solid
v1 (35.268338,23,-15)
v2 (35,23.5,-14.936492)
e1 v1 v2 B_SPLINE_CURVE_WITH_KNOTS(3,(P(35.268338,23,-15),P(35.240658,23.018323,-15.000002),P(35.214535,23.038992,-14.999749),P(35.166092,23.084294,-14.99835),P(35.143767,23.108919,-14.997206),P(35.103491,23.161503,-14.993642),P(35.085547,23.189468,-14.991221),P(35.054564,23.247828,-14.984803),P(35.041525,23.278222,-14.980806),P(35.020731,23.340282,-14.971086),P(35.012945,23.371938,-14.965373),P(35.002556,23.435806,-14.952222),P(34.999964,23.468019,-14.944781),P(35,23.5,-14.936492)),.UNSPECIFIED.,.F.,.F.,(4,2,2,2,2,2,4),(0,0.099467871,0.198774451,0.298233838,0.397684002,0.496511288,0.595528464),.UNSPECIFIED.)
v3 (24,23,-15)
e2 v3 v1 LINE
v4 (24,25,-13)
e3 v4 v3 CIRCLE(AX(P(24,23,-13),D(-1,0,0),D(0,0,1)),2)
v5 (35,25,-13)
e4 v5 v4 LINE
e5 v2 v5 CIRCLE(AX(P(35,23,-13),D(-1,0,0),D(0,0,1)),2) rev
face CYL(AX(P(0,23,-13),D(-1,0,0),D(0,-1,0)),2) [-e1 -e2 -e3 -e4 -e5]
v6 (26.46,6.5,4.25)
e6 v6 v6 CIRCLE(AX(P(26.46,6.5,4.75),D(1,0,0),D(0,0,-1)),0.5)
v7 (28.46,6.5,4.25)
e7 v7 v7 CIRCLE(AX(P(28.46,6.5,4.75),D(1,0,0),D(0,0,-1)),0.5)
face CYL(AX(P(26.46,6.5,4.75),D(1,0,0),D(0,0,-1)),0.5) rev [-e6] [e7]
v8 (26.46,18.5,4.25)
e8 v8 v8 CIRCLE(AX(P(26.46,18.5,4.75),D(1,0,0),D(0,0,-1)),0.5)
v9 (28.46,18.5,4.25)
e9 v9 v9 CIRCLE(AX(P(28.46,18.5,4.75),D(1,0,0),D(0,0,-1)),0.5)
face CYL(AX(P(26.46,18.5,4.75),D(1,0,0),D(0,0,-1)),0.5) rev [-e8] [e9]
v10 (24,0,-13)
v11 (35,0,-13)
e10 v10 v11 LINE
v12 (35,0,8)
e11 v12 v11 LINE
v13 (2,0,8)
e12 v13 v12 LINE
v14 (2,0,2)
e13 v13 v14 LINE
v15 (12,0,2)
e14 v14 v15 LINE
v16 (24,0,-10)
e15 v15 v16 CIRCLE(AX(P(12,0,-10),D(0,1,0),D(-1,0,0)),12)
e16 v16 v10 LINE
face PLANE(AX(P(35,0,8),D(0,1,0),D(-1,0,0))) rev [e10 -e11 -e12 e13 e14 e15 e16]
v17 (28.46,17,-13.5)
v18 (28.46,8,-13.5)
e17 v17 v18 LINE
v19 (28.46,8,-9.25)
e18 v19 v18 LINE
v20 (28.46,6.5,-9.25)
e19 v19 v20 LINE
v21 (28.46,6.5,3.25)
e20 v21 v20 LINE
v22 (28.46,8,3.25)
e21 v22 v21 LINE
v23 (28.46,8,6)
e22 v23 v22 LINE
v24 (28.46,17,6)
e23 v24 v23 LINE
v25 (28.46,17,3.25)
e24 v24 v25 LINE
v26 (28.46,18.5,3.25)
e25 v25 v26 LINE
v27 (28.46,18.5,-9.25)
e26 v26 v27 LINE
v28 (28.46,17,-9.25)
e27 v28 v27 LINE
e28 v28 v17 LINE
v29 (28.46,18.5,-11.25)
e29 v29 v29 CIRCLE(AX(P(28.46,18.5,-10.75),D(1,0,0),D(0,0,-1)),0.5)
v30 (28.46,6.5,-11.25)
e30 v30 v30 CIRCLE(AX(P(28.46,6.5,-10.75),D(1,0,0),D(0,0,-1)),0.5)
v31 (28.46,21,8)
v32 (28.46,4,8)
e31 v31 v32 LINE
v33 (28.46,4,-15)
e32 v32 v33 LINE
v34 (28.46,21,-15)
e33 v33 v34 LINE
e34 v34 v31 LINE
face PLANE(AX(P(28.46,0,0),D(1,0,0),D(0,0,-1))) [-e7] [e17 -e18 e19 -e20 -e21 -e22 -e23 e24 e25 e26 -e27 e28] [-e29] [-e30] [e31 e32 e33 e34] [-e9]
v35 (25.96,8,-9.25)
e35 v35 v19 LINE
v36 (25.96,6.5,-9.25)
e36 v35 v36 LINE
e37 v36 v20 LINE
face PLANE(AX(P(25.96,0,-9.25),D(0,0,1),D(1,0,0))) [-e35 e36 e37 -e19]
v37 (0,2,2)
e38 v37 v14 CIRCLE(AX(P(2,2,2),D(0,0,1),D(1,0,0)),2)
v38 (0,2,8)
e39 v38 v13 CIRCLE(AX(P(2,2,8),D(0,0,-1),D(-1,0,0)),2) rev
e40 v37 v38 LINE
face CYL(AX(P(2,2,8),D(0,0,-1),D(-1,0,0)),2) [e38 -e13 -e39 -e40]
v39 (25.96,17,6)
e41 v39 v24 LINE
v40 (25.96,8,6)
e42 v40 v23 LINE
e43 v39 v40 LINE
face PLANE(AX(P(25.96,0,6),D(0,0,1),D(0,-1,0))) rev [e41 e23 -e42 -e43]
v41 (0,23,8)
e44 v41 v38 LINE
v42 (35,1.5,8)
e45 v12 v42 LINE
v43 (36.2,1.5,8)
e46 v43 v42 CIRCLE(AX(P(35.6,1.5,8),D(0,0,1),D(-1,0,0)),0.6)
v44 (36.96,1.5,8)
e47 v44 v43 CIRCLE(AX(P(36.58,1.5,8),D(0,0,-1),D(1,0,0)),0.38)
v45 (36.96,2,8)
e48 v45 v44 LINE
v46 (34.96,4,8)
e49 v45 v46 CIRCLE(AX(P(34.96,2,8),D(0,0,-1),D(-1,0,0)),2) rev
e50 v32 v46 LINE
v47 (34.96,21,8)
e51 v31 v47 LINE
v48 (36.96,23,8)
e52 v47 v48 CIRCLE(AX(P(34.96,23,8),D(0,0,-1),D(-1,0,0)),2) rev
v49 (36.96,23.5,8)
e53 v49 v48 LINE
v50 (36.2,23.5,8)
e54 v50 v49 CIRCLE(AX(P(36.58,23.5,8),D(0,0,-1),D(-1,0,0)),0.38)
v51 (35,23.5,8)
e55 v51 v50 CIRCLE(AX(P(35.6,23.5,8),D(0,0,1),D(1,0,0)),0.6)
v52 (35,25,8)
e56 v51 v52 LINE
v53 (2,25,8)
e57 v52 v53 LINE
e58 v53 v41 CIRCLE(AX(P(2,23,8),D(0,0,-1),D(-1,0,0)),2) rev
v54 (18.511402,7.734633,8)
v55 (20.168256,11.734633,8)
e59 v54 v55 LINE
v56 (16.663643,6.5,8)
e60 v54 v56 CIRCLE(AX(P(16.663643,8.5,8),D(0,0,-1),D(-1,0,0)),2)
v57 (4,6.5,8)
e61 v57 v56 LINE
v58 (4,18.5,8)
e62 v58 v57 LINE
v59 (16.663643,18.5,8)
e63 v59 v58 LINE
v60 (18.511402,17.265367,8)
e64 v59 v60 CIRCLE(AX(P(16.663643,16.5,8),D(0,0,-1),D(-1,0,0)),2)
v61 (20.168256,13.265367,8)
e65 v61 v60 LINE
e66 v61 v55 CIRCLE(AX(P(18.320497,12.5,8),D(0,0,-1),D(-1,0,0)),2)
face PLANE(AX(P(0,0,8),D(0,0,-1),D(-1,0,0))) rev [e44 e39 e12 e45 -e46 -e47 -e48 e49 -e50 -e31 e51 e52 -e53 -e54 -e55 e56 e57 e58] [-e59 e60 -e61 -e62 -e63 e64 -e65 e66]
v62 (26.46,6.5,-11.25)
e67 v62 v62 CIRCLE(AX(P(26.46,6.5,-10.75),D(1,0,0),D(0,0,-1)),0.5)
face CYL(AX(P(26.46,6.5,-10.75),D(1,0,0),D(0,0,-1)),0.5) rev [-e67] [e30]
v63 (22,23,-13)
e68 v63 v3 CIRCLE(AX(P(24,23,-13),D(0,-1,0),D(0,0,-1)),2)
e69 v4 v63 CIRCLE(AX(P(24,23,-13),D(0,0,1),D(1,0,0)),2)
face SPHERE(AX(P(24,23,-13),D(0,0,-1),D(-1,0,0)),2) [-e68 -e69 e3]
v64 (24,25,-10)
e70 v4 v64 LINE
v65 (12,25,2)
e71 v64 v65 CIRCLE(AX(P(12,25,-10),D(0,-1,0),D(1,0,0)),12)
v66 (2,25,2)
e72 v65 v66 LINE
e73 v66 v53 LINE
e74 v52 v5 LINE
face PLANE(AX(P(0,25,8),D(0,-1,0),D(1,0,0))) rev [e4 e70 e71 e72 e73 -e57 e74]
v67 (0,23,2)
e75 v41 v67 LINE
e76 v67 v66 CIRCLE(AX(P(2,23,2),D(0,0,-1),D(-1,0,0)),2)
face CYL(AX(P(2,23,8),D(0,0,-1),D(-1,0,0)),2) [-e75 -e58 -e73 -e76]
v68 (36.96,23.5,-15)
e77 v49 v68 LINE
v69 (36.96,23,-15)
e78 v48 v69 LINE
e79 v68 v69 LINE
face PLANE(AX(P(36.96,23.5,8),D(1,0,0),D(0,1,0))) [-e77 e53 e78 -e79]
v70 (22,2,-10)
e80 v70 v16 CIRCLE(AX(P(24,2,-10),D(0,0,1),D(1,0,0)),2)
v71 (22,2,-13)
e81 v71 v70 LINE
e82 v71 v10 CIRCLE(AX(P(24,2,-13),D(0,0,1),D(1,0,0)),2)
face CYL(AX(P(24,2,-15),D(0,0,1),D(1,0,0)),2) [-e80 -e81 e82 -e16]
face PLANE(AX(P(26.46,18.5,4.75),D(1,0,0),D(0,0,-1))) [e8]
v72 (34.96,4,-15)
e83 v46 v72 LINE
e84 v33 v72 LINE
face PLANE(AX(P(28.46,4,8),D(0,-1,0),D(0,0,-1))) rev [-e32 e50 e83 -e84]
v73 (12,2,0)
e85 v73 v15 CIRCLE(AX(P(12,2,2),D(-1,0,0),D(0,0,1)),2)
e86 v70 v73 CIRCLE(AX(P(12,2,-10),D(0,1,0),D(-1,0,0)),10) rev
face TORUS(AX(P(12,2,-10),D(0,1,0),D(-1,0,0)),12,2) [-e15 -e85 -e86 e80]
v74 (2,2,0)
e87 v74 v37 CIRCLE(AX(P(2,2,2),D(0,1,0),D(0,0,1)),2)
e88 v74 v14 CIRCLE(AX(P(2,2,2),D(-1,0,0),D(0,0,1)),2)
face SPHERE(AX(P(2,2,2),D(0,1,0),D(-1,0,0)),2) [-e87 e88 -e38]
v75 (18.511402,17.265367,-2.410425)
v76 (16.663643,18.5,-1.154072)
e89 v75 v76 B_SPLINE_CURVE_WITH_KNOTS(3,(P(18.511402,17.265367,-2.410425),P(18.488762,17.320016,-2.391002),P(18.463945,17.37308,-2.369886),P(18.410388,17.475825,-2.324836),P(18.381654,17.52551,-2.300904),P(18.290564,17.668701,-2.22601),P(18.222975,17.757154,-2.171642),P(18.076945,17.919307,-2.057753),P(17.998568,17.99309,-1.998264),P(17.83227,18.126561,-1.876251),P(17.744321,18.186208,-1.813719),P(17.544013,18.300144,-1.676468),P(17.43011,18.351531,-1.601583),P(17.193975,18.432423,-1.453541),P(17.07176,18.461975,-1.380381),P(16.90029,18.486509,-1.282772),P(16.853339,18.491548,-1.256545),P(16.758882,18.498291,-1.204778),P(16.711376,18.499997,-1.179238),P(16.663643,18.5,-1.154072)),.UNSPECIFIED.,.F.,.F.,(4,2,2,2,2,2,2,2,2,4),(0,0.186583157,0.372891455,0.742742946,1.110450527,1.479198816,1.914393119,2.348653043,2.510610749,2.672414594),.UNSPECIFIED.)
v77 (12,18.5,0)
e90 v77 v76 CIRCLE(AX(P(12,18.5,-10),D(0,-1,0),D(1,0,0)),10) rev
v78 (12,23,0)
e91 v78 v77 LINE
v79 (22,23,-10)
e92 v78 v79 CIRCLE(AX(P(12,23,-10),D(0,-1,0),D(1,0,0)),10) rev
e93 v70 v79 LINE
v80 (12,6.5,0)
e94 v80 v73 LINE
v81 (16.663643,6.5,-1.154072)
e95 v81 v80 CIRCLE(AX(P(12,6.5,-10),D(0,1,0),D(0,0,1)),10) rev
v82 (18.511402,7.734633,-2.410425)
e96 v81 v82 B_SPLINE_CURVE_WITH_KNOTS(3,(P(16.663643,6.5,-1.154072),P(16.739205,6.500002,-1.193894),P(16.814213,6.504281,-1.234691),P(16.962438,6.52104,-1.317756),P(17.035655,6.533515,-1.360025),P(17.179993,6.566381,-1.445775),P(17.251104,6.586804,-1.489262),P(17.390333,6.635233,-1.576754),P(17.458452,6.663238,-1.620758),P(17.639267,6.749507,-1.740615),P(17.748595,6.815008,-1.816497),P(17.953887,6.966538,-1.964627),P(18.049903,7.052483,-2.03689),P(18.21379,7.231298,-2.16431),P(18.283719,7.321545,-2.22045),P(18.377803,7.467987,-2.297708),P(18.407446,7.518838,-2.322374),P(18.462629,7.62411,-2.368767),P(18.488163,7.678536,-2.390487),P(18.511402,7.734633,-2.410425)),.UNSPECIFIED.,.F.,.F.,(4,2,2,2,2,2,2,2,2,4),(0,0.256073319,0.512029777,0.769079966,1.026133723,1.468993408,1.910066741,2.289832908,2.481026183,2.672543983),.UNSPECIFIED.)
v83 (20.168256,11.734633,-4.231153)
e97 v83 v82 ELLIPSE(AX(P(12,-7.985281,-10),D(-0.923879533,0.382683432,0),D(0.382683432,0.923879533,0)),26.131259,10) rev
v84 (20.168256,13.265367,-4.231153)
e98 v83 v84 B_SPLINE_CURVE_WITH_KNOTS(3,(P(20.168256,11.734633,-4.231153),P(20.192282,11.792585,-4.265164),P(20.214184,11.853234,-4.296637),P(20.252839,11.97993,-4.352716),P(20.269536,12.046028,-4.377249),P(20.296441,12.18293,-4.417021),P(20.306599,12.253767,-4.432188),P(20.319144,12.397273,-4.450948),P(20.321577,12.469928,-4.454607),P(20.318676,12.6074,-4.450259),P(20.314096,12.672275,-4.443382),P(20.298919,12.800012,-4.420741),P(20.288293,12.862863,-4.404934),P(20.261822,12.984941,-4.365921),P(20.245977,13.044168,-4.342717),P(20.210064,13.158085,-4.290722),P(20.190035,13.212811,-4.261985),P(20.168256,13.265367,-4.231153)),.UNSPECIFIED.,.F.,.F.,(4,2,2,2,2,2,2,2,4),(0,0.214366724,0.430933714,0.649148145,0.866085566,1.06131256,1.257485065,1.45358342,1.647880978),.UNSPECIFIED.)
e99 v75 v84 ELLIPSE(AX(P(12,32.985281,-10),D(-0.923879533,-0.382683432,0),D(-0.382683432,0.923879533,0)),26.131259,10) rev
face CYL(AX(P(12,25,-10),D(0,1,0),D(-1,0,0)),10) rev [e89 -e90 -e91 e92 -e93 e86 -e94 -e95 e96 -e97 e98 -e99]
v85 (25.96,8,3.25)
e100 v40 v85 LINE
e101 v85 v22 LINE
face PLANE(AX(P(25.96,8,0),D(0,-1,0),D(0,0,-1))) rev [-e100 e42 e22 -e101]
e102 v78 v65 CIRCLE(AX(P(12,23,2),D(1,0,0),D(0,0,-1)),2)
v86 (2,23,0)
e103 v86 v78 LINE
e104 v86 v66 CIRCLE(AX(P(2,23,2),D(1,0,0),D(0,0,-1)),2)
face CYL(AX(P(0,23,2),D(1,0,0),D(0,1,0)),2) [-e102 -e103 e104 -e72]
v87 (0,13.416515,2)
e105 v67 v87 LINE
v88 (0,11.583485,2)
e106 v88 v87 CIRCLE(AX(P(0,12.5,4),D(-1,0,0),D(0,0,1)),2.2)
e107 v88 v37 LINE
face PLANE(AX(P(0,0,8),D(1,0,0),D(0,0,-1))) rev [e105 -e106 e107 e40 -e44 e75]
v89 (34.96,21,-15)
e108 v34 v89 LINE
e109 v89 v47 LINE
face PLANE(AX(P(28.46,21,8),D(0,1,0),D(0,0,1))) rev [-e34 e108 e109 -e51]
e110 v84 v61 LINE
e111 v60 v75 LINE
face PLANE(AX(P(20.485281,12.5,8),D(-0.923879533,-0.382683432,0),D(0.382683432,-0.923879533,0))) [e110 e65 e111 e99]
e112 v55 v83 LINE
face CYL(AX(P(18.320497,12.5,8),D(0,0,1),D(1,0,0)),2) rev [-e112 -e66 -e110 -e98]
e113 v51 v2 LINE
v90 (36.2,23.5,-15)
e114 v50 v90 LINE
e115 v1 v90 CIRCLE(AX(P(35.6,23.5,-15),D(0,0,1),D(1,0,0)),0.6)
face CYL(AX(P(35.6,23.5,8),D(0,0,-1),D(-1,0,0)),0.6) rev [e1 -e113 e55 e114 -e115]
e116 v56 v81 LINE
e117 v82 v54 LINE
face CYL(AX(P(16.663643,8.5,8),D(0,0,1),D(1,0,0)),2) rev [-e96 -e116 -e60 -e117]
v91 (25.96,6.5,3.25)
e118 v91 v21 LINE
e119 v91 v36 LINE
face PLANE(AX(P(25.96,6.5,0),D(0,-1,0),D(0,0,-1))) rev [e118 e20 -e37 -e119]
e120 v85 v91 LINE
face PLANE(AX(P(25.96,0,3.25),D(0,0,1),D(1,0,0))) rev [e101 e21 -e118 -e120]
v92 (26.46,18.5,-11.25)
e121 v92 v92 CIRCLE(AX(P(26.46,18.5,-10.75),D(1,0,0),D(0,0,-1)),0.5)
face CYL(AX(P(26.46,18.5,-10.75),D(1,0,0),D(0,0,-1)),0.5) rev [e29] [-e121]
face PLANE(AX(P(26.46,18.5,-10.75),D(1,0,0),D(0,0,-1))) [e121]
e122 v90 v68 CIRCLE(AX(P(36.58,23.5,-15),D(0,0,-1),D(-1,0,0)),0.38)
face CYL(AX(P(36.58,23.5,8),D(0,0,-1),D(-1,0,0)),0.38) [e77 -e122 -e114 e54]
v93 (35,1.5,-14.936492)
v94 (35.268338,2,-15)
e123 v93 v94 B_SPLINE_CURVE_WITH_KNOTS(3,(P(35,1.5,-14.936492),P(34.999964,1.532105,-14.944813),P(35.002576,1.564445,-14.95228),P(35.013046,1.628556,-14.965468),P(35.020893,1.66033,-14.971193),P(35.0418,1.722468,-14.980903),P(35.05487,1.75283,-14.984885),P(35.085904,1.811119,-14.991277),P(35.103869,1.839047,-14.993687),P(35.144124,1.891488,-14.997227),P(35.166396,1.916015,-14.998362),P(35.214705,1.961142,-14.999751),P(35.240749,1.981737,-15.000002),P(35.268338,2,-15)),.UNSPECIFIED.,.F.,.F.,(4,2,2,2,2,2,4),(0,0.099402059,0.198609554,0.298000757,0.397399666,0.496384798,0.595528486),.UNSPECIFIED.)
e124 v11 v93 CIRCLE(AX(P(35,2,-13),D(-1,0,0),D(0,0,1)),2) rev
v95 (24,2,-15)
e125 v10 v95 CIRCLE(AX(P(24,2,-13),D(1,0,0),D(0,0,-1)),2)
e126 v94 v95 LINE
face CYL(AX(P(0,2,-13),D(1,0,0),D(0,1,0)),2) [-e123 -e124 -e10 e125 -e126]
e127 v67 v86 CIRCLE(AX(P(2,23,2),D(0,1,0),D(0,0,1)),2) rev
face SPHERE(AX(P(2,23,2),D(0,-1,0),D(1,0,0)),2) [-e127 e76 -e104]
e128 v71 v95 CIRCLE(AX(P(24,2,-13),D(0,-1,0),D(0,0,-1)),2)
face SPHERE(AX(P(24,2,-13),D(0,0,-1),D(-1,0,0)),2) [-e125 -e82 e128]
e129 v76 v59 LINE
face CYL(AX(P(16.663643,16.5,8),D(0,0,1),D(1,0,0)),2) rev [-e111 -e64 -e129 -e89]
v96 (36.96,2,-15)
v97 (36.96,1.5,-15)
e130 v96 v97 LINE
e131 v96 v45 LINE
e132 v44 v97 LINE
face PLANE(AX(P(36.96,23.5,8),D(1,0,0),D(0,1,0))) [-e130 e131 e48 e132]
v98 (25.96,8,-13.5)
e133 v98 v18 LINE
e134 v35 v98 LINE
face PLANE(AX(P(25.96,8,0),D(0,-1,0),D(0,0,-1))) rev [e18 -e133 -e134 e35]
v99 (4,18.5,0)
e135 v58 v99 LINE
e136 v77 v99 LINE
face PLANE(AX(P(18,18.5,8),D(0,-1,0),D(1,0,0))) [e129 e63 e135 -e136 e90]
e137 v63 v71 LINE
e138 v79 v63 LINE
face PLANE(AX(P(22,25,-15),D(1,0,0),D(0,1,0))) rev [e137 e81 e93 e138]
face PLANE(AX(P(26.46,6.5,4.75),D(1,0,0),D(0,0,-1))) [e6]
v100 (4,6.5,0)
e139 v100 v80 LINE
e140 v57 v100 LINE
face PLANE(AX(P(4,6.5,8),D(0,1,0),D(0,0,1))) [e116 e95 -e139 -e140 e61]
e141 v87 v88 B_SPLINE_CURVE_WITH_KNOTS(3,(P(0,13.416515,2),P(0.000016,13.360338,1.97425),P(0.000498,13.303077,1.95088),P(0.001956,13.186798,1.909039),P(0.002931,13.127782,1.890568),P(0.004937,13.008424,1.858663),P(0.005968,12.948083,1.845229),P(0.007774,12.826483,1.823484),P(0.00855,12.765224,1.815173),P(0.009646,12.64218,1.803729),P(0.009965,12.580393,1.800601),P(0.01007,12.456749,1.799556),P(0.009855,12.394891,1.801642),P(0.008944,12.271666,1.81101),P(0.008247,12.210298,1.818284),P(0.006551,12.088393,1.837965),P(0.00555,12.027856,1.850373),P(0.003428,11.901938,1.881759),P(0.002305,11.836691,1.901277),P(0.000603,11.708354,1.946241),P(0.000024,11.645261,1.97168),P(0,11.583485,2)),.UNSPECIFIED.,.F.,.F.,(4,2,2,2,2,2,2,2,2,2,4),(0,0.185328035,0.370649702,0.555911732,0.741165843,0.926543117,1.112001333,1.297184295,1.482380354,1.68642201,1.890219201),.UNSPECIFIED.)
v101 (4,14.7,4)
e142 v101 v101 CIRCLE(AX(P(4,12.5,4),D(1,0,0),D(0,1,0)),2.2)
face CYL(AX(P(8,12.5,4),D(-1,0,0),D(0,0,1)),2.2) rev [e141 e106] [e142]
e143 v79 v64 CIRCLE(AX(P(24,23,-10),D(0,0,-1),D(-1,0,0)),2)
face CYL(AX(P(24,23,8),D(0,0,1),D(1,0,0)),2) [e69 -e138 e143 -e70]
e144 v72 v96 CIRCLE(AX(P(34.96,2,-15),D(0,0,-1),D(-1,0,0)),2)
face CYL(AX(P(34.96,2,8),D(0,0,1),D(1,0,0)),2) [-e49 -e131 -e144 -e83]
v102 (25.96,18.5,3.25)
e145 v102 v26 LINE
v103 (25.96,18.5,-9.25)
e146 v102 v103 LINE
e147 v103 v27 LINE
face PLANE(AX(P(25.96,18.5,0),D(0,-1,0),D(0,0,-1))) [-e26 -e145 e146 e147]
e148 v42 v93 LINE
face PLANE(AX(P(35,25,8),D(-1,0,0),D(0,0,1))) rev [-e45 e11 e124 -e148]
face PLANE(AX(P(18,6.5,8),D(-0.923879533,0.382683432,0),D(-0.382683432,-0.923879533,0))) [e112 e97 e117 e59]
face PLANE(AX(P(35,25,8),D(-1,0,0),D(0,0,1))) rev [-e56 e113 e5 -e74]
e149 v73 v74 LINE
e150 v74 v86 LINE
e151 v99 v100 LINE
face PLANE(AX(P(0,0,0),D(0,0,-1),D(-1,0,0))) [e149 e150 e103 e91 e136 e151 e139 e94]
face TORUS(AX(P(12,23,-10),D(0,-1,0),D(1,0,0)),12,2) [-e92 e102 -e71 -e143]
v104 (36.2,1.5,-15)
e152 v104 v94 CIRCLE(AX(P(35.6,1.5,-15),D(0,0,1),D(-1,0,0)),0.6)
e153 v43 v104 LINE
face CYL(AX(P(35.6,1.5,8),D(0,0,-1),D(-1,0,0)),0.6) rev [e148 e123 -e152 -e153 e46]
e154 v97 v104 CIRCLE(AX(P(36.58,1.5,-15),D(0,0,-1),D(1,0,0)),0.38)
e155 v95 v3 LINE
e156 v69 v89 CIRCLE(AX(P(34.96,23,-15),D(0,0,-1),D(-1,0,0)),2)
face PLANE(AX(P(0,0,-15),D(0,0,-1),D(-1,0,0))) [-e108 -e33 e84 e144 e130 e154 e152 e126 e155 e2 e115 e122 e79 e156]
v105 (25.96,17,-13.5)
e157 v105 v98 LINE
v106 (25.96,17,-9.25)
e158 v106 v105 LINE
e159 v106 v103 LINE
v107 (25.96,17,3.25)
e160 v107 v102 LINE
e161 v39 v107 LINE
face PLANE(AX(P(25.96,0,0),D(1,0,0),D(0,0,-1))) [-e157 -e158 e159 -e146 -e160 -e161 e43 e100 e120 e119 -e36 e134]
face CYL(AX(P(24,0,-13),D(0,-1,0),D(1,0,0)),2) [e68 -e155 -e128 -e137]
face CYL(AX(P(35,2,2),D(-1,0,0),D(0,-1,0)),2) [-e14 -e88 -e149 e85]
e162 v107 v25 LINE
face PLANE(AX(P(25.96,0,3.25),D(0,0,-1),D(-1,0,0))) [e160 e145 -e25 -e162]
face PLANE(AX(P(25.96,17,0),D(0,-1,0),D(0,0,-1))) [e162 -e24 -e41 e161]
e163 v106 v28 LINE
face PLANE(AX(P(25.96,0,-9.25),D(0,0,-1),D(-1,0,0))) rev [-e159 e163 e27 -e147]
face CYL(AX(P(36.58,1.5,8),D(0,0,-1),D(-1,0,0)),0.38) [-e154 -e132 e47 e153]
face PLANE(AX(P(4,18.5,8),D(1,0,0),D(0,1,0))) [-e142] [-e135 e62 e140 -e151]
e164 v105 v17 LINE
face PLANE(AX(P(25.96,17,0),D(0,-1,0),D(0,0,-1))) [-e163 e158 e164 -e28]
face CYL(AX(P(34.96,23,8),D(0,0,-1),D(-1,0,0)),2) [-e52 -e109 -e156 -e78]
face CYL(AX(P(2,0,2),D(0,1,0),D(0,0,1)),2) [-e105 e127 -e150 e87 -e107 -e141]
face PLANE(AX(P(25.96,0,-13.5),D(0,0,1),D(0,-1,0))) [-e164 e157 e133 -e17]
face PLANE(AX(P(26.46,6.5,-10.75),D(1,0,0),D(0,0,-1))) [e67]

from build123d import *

# Parameters (mm, degrees)
P_IDAT_VYSUNUT_M1_DEPTH  = 8
SKICA2_R                 = 2.2
ODEBRAT_VYSUNUT_M1_DEPTH = 8
P_IDAT_VYSUNUT_M3_DEPTH  = 15
ZAOBLIT3_R               = 10
ZAOBLIT5_R               = 2
ZAOBLIT6_R               = 2
ZAOBLIT7_R               = 2
P_IDAT_VYSUNUT_M6_DEPTH  = 23
ZAOBLIT12_R              = 2
ZAOBLIT13_R              = 2
ZAOBLIT14_R              = 2
ZAOBLIT15_R              = 2
ODEBRAT_VYSUNUT_M4_DEPTH = 8.5
ZAOBLIT18_R              = 2
ZAOBLIT19_R              = 2
SKICA8_R                 = 0.5000000000000009
SKICA8_W                 = 12.000000000000004
SKICA8_H                 = 9
ODEBRAT_VYSUNUT_M5_DEPTH = 2
SKICA9_W                 = 12.000000000000004
SKICA9_H                 = 9
ODEBRAT_VYSUNUT_M6_DEPTH = 2.5


with BuildPart() as part:
    # Skica1 → Přidat vysunutím1 (new body)
    with BuildSketch(Plane.XY):
        Polygon((0, 0), (0, 25), (35, 25.000000000000004), (35, -3.47e-15), align=None)
        Polygon((3.999999999999999, 18.500000000000004), (4, 6.500000000000001), (18, 6.500000000000001), (20.485281374238575, 12.499999999999996), (18, 18.499999999999996), align=None, mode=Mode.SUBTRACT)
    extrude(amount=P_IDAT_VYSUNUT_M1_DEPTH)

    # Skica2 → Odebrat vysunutím1 (cut)
    with BuildSketch(Plane.ZY):
        with Locations((4, 12.5)):
            Circle(SKICA2_R)
    extrude(amount=-ODEBRAT_VYSUNUT_M1_DEPTH, mode=Mode.SUBTRACT)

    # Skica3 → Přidat vysunutím3 (add)
    with BuildSketch(Plane(origin=(0, 0, 0), x_dir=(-1, 0, 0), z_dir=(0, 0, -1))):
        Polygon((-35, 25.000000000000004), (-22, 25.000000000000004), (-21.999999999999996, 0), (-35, 0), align=None)
    extrude(amount=P_IDAT_VYSUNUT_M3_DEPTH)

    # Zaoblit3
    # the kernel refuses this fillet: 10 mm, written as the material it adds along each edge
    with BuildSketch(Plane(origin=(22, 25.000000000000004, 0), x_dir=(0, 0, -1), z_dir=(-1.4e-16, -1, 0))) as zaoblit3_piece_1_section:
        with BuildLine():
            CenterArc((ZAOBLIT3_R, -ZAOBLIT3_R), ZAOBLIT3_R, 90, 90)
            Line((-1.78e-15, -ZAOBLIT3_R), (0, 0))
            Line((0, 0), (ZAOBLIT3_R, 0))
        make_face()
    zaoblit3_piece_1 = extrude(amount=49.99999999999999, mode=Mode.PRIVATE)
    zaoblit3_piece_1 = split(zaoblit3_piece_1, bisect_by=Plane(origin=(17.13517134220591, 20.587881074775396, -2.4104777479798574), z_dir=(0.9238795325112865, 0.3826834323650904, 0)), keep=Keep.TOP, mode=Mode.PRIVATE)
    add(zaoblit3_piece_1)
    with BuildSketch(Plane(origin=(22, 25.000000000000004, 0), x_dir=(0, 0, -1), z_dir=(-1.4e-16, -1, 0))) as zaoblit3_piece_2_section:
        with BuildLine():
            CenterArc((ZAOBLIT3_R, -ZAOBLIT3_R), ZAOBLIT3_R, 90, 90)
            Line((-1.78e-15, -ZAOBLIT3_R), (0, 0))
            Line((0, 0), (ZAOBLIT3_R, 0))
        make_face()
    zaoblit3_piece_2 = extrude(amount=49.99999999999999, mode=Mode.PRIVATE)
    zaoblit3_piece_2 = split(zaoblit3_piece_2, bisect_by=Plane(origin=(15.789776111016284, 18.499999999999996, -0.41218867261979963), z_dir=(5.1e-16, 1, 0)), keep=Keep.TOP, mode=Mode.PRIVATE)
    add(zaoblit3_piece_2)
    with BuildSketch(Plane(origin=(22.000000000000004, 50, 0), x_dir=(0, 0, -1), z_dir=(-1.4e-16, -1, 0))) as zaoblit3_piece_3_section:
        with BuildLine():
            CenterArc((ZAOBLIT3_R, -ZAOBLIT3_R), ZAOBLIT3_R, 90, 90)
            Line((-1.78e-15, -ZAOBLIT3_R), (0, 0))
            Line((0, 0), (ZAOBLIT3_R, 0))
        make_face()
    zaoblit3_piece_3 = extrude(amount=50, mode=Mode.PRIVATE)
    zaoblit3_piece_3 = split(zaoblit3_piece_3, bisect_by=Plane(origin=(15.78977611101612, 6.500000000000001, -0.41218867261958336), z_dir=(0, -1, 0)), keep=Keep.TOP, mode=Mode.PRIVATE)
    add(zaoblit3_piece_3)
    with BuildSketch(Plane(origin=(22.000000000000004, 50, 0), x_dir=(0, 0, -1), z_dir=(-1.4e-16, -1, 0))) as zaoblit3_piece_4_section:
        with BuildLine():
            CenterArc((ZAOBLIT3_R, -ZAOBLIT3_R), ZAOBLIT3_R, 90, 90)
            Line((-1.78e-15, -ZAOBLIT3_R), (0, 0))
            Line((0, 0), (ZAOBLIT3_R, 0))
        make_face()
    zaoblit3_piece_4 = extrude(amount=50, mode=Mode.PRIVATE)
    zaoblit3_piece_4 = split(zaoblit3_piece_4, bisect_by=Plane(origin=(19.135383660262896, 9.241058631103481, -2.632109872171155), z_dir=(0.9238795325112864, -0.38268343236509067, 0)), keep=Keep.TOP, mode=Mode.PRIVATE)
    add(zaoblit3_piece_4)

    # Zaoblit5
    # the kernel refuses this fillet: 2 mm, written as the material it takes off along each edge
    with BuildSketch(Plane(origin=(0, -5, 0), x_dir=(0, 0, 1), z_dir=(0, 1, 0))) as zaoblit5_piece_1:
        with BuildLine():
            CenterArc((ZAOBLIT5_R, ZAOBLIT5_R), ZAOBLIT5_R, 180, 90)
            Line((-2.2e-16, ZAOBLIT5_R), (0, 0))
            Line((0, 0), (ZAOBLIT5_R, 0))
        make_face()
    extrude(amount=35, mode=Mode.SUBTRACT)

    # Zaoblit6
    zaoblit6_edges = [part.edges().sort_by_distance(p)[0] for p in [
        (21.999999999999996, 0, -12.5),
        (19.071067811865476, 0, -2.9289321881345254),
        (7, -6.9e-16, 0),
        (0.5857864376269049, 0, 0.5857864376269051),
        (0, 0, 5),
    ]]
    fillet(zaoblit6_edges, radius=ZAOBLIT6_R)

    # Zaoblit7
    zaoblit7_edges = [part.edges().sort_by_distance(p)[0] for p in [
        (22, 25.000000000000004, -12.5),
        (7, 25, 0),
        (19.071067811865476, 25, -2.9289321881345245),
        (0.5857864376269049, 25, 0.5857864376269051),
        (0, 25, 5),
    ]]
    fillet(zaoblit7_edges, radius=ZAOBLIT7_R)

    # Skica6 → Přidat vysunutím6 (add)
    with BuildSketch(Plane(origin=(0, 0, -15), x_dir=(-1, 0, 0), z_dir=(0, 0, -1))):
        with BuildLine():
            Line((-35, 23.500000000000004), (-35, 1.5))
            ThreePointArc((-35, 1.5), (-35.60000000229765, 2.1000000000000085), (-36.2, 1.4999999954047263))
            ThreePointArc((-36.2, 1.4999999954047263), (-36.58, 1.1199999924943909), (-36.96, 1.4999999954047263))
            Line((-36.96, 1.4999999954047263), (-36.959999999999994, 23.500000000000096))
            ThreePointArc((-36.959999999999994, 23.500000000000096), (-36.58, 23.88000000000009), (-36.2, 23.500000000000096))
            ThreePointArc((-36.2, 23.500000000000096), (-35.60000000000006, 22.9), (-35, 23.500000000000004))
        make_face()
    extrude(amount=-P_IDAT_VYSUNUT_M6_DEPTH)

    # Zaoblit12
    zaoblit12_edges = [part.edges().sort_by_distance(p)[0] for p in [
        (29.5, 0, -15),
        (22.5857864376269, 0.5857864376269046, -15),
        (29.5, 25.000000000000004, -15),
        (22.585786437626904, 24.414213562373096, -15),
        (21.999999999999996, 12.5, -15),
    ]]
    fillet(zaoblit12_edges, radius=ZAOBLIT12_R)

    # Zaoblit13
    zaoblit13_edges = [part.edges().sort_by_distance(p)[0] for p in [
        (20.485281374238724, 12.499999999999886, 1.6457513110643447),
    ]]
    fillet(zaoblit13_edges, radius=ZAOBLIT13_R)

    # Zaoblit14
    zaoblit14_edges = [part.edges().sort_by_distance(p)[0] for p in [
        (17.99999999999998, 18.500000000000004, 3.000000000000016),
    ]]
    fillet(zaoblit14_edges, radius=ZAOBLIT14_R)

    # Zaoblit15
    zaoblit15_edges = [part.edges().sort_by_distance(p)[0] for p in [
        (18.0000000000001, 6.499999999999996, 2.9999999999999263),
    ]]
    fillet(zaoblit15_edges, radius=ZAOBLIT15_R)

    # Skica7 → Odebrat vysunutím4 (cut)
    with BuildSketch(Plane(origin=(36.96, 1.166e-14, 0), x_dir=(0, 0, -1), z_dir=(1, 0, 0))):
        Polygon((-8, 21.00000000000012), (15, 21.00000000000012), (15.000000000000005, 4.000000000000118), (-7.999999999999998, 4.000000000000118), align=None)
    extrude(amount=-ODEBRAT_VYSUNUT_M4_DEPTH, mode=Mode.SUBTRACT)

    # Zaoblit18
    zaoblit18_edges = [part.edges().sort_by_distance(p)[0] for p in [
        (36.96, 21.00000000000013, -3.5),
    ]]
    fillet(zaoblit18_edges, radius=ZAOBLIT18_R)

    # Zaoblit19
    zaoblit19_edges = [part.edges().sort_by_distance(p)[0] for p in [
        (36.96, 4.00000000000013, -3.5000000000000036),
    ]]
    fillet(zaoblit19_edges, radius=ZAOBLIT19_R)

    # Skica8 → Odebrat vysunutím5 (cut)
    with BuildSketch(Plane(origin=(28.46, 0, 0), x_dir=(0, 0, -1), z_dir=(1, 0, 0))):
        with Locations((-4.750000000000001, 18.50000000000013)):
            Circle(SKICA8_R)
        with Locations((-4.750000000000001, 6.500000000000129)):
            Circle(SKICA8_R)
        with Locations((10.750000000000002, 18.50000000000013)):
            Circle(SKICA8_R)
        with Locations((10.750000000000002, 6.500000000000129)):
            Circle(SKICA8_R)
        with Locations((3.000000000000002, 12.500000000000128)):
            Rectangle(SKICA8_W, SKICA8_H)
    extrude(amount=-ODEBRAT_VYSUNUT_M5_DEPTH, mode=Mode.SUBTRACT)

    # Skica9 → Odebrat vysunutím6 (cut)
    with BuildSketch(Plane(origin=(28.46, 0, 0), x_dir=(0, 0, -1), z_dir=(1, 0, 0))):
        Polygon((-3.250000000000001, 17.000000000000128), (-5.999999999999998, 17.000000000000128), (-5.999999999999997, 8.000000000000128), (-3.2500000000000004, 8.000000000000128), (-2.9999999999999987, 8.000000000000128), (-2.9999999999999987, 17.000000000000128), align=None)
        Polygon((-3.250000000000001, 18.50000000000013), (-3.250000000000001, 17.000000000000128), (-2.9999999999999987, 17.000000000000128), (9.000000000000004, 17.000000000000128), (9.250000000000002, 17.000000000000128), (9.250000000000002, 18.50000000000013), align=None)
        Polygon((9.250000000000002, 17.000000000000128), (9.000000000000004, 17.000000000000128), (9.000000000000004, 8.000000000000128), (9.250000000000004, 8.000000000000128), (13.500000000000004, 8.000000000000128), (13.500000000000002, 17.000000000000128), align=None)
        with Locations((3.000000000000002, 12.500000000000128)):
            Rectangle(SKICA9_W, SKICA9_H)
        Polygon((-2.9999999999999987, 8.000000000000128), (-3.2500000000000004, 8.000000000000128), (-3.2500000000000004, 6.500000000000129), (9.250000000000002, 6.500000000000129), (9.250000000000002, 8.000000000000128), (9.000000000000004, 8.000000000000128), align=None)
    extrude(amount=-ODEBRAT_VYSUNUT_M6_DEPTH, mode=Mode.SUBTRACT)


solid = part.part
